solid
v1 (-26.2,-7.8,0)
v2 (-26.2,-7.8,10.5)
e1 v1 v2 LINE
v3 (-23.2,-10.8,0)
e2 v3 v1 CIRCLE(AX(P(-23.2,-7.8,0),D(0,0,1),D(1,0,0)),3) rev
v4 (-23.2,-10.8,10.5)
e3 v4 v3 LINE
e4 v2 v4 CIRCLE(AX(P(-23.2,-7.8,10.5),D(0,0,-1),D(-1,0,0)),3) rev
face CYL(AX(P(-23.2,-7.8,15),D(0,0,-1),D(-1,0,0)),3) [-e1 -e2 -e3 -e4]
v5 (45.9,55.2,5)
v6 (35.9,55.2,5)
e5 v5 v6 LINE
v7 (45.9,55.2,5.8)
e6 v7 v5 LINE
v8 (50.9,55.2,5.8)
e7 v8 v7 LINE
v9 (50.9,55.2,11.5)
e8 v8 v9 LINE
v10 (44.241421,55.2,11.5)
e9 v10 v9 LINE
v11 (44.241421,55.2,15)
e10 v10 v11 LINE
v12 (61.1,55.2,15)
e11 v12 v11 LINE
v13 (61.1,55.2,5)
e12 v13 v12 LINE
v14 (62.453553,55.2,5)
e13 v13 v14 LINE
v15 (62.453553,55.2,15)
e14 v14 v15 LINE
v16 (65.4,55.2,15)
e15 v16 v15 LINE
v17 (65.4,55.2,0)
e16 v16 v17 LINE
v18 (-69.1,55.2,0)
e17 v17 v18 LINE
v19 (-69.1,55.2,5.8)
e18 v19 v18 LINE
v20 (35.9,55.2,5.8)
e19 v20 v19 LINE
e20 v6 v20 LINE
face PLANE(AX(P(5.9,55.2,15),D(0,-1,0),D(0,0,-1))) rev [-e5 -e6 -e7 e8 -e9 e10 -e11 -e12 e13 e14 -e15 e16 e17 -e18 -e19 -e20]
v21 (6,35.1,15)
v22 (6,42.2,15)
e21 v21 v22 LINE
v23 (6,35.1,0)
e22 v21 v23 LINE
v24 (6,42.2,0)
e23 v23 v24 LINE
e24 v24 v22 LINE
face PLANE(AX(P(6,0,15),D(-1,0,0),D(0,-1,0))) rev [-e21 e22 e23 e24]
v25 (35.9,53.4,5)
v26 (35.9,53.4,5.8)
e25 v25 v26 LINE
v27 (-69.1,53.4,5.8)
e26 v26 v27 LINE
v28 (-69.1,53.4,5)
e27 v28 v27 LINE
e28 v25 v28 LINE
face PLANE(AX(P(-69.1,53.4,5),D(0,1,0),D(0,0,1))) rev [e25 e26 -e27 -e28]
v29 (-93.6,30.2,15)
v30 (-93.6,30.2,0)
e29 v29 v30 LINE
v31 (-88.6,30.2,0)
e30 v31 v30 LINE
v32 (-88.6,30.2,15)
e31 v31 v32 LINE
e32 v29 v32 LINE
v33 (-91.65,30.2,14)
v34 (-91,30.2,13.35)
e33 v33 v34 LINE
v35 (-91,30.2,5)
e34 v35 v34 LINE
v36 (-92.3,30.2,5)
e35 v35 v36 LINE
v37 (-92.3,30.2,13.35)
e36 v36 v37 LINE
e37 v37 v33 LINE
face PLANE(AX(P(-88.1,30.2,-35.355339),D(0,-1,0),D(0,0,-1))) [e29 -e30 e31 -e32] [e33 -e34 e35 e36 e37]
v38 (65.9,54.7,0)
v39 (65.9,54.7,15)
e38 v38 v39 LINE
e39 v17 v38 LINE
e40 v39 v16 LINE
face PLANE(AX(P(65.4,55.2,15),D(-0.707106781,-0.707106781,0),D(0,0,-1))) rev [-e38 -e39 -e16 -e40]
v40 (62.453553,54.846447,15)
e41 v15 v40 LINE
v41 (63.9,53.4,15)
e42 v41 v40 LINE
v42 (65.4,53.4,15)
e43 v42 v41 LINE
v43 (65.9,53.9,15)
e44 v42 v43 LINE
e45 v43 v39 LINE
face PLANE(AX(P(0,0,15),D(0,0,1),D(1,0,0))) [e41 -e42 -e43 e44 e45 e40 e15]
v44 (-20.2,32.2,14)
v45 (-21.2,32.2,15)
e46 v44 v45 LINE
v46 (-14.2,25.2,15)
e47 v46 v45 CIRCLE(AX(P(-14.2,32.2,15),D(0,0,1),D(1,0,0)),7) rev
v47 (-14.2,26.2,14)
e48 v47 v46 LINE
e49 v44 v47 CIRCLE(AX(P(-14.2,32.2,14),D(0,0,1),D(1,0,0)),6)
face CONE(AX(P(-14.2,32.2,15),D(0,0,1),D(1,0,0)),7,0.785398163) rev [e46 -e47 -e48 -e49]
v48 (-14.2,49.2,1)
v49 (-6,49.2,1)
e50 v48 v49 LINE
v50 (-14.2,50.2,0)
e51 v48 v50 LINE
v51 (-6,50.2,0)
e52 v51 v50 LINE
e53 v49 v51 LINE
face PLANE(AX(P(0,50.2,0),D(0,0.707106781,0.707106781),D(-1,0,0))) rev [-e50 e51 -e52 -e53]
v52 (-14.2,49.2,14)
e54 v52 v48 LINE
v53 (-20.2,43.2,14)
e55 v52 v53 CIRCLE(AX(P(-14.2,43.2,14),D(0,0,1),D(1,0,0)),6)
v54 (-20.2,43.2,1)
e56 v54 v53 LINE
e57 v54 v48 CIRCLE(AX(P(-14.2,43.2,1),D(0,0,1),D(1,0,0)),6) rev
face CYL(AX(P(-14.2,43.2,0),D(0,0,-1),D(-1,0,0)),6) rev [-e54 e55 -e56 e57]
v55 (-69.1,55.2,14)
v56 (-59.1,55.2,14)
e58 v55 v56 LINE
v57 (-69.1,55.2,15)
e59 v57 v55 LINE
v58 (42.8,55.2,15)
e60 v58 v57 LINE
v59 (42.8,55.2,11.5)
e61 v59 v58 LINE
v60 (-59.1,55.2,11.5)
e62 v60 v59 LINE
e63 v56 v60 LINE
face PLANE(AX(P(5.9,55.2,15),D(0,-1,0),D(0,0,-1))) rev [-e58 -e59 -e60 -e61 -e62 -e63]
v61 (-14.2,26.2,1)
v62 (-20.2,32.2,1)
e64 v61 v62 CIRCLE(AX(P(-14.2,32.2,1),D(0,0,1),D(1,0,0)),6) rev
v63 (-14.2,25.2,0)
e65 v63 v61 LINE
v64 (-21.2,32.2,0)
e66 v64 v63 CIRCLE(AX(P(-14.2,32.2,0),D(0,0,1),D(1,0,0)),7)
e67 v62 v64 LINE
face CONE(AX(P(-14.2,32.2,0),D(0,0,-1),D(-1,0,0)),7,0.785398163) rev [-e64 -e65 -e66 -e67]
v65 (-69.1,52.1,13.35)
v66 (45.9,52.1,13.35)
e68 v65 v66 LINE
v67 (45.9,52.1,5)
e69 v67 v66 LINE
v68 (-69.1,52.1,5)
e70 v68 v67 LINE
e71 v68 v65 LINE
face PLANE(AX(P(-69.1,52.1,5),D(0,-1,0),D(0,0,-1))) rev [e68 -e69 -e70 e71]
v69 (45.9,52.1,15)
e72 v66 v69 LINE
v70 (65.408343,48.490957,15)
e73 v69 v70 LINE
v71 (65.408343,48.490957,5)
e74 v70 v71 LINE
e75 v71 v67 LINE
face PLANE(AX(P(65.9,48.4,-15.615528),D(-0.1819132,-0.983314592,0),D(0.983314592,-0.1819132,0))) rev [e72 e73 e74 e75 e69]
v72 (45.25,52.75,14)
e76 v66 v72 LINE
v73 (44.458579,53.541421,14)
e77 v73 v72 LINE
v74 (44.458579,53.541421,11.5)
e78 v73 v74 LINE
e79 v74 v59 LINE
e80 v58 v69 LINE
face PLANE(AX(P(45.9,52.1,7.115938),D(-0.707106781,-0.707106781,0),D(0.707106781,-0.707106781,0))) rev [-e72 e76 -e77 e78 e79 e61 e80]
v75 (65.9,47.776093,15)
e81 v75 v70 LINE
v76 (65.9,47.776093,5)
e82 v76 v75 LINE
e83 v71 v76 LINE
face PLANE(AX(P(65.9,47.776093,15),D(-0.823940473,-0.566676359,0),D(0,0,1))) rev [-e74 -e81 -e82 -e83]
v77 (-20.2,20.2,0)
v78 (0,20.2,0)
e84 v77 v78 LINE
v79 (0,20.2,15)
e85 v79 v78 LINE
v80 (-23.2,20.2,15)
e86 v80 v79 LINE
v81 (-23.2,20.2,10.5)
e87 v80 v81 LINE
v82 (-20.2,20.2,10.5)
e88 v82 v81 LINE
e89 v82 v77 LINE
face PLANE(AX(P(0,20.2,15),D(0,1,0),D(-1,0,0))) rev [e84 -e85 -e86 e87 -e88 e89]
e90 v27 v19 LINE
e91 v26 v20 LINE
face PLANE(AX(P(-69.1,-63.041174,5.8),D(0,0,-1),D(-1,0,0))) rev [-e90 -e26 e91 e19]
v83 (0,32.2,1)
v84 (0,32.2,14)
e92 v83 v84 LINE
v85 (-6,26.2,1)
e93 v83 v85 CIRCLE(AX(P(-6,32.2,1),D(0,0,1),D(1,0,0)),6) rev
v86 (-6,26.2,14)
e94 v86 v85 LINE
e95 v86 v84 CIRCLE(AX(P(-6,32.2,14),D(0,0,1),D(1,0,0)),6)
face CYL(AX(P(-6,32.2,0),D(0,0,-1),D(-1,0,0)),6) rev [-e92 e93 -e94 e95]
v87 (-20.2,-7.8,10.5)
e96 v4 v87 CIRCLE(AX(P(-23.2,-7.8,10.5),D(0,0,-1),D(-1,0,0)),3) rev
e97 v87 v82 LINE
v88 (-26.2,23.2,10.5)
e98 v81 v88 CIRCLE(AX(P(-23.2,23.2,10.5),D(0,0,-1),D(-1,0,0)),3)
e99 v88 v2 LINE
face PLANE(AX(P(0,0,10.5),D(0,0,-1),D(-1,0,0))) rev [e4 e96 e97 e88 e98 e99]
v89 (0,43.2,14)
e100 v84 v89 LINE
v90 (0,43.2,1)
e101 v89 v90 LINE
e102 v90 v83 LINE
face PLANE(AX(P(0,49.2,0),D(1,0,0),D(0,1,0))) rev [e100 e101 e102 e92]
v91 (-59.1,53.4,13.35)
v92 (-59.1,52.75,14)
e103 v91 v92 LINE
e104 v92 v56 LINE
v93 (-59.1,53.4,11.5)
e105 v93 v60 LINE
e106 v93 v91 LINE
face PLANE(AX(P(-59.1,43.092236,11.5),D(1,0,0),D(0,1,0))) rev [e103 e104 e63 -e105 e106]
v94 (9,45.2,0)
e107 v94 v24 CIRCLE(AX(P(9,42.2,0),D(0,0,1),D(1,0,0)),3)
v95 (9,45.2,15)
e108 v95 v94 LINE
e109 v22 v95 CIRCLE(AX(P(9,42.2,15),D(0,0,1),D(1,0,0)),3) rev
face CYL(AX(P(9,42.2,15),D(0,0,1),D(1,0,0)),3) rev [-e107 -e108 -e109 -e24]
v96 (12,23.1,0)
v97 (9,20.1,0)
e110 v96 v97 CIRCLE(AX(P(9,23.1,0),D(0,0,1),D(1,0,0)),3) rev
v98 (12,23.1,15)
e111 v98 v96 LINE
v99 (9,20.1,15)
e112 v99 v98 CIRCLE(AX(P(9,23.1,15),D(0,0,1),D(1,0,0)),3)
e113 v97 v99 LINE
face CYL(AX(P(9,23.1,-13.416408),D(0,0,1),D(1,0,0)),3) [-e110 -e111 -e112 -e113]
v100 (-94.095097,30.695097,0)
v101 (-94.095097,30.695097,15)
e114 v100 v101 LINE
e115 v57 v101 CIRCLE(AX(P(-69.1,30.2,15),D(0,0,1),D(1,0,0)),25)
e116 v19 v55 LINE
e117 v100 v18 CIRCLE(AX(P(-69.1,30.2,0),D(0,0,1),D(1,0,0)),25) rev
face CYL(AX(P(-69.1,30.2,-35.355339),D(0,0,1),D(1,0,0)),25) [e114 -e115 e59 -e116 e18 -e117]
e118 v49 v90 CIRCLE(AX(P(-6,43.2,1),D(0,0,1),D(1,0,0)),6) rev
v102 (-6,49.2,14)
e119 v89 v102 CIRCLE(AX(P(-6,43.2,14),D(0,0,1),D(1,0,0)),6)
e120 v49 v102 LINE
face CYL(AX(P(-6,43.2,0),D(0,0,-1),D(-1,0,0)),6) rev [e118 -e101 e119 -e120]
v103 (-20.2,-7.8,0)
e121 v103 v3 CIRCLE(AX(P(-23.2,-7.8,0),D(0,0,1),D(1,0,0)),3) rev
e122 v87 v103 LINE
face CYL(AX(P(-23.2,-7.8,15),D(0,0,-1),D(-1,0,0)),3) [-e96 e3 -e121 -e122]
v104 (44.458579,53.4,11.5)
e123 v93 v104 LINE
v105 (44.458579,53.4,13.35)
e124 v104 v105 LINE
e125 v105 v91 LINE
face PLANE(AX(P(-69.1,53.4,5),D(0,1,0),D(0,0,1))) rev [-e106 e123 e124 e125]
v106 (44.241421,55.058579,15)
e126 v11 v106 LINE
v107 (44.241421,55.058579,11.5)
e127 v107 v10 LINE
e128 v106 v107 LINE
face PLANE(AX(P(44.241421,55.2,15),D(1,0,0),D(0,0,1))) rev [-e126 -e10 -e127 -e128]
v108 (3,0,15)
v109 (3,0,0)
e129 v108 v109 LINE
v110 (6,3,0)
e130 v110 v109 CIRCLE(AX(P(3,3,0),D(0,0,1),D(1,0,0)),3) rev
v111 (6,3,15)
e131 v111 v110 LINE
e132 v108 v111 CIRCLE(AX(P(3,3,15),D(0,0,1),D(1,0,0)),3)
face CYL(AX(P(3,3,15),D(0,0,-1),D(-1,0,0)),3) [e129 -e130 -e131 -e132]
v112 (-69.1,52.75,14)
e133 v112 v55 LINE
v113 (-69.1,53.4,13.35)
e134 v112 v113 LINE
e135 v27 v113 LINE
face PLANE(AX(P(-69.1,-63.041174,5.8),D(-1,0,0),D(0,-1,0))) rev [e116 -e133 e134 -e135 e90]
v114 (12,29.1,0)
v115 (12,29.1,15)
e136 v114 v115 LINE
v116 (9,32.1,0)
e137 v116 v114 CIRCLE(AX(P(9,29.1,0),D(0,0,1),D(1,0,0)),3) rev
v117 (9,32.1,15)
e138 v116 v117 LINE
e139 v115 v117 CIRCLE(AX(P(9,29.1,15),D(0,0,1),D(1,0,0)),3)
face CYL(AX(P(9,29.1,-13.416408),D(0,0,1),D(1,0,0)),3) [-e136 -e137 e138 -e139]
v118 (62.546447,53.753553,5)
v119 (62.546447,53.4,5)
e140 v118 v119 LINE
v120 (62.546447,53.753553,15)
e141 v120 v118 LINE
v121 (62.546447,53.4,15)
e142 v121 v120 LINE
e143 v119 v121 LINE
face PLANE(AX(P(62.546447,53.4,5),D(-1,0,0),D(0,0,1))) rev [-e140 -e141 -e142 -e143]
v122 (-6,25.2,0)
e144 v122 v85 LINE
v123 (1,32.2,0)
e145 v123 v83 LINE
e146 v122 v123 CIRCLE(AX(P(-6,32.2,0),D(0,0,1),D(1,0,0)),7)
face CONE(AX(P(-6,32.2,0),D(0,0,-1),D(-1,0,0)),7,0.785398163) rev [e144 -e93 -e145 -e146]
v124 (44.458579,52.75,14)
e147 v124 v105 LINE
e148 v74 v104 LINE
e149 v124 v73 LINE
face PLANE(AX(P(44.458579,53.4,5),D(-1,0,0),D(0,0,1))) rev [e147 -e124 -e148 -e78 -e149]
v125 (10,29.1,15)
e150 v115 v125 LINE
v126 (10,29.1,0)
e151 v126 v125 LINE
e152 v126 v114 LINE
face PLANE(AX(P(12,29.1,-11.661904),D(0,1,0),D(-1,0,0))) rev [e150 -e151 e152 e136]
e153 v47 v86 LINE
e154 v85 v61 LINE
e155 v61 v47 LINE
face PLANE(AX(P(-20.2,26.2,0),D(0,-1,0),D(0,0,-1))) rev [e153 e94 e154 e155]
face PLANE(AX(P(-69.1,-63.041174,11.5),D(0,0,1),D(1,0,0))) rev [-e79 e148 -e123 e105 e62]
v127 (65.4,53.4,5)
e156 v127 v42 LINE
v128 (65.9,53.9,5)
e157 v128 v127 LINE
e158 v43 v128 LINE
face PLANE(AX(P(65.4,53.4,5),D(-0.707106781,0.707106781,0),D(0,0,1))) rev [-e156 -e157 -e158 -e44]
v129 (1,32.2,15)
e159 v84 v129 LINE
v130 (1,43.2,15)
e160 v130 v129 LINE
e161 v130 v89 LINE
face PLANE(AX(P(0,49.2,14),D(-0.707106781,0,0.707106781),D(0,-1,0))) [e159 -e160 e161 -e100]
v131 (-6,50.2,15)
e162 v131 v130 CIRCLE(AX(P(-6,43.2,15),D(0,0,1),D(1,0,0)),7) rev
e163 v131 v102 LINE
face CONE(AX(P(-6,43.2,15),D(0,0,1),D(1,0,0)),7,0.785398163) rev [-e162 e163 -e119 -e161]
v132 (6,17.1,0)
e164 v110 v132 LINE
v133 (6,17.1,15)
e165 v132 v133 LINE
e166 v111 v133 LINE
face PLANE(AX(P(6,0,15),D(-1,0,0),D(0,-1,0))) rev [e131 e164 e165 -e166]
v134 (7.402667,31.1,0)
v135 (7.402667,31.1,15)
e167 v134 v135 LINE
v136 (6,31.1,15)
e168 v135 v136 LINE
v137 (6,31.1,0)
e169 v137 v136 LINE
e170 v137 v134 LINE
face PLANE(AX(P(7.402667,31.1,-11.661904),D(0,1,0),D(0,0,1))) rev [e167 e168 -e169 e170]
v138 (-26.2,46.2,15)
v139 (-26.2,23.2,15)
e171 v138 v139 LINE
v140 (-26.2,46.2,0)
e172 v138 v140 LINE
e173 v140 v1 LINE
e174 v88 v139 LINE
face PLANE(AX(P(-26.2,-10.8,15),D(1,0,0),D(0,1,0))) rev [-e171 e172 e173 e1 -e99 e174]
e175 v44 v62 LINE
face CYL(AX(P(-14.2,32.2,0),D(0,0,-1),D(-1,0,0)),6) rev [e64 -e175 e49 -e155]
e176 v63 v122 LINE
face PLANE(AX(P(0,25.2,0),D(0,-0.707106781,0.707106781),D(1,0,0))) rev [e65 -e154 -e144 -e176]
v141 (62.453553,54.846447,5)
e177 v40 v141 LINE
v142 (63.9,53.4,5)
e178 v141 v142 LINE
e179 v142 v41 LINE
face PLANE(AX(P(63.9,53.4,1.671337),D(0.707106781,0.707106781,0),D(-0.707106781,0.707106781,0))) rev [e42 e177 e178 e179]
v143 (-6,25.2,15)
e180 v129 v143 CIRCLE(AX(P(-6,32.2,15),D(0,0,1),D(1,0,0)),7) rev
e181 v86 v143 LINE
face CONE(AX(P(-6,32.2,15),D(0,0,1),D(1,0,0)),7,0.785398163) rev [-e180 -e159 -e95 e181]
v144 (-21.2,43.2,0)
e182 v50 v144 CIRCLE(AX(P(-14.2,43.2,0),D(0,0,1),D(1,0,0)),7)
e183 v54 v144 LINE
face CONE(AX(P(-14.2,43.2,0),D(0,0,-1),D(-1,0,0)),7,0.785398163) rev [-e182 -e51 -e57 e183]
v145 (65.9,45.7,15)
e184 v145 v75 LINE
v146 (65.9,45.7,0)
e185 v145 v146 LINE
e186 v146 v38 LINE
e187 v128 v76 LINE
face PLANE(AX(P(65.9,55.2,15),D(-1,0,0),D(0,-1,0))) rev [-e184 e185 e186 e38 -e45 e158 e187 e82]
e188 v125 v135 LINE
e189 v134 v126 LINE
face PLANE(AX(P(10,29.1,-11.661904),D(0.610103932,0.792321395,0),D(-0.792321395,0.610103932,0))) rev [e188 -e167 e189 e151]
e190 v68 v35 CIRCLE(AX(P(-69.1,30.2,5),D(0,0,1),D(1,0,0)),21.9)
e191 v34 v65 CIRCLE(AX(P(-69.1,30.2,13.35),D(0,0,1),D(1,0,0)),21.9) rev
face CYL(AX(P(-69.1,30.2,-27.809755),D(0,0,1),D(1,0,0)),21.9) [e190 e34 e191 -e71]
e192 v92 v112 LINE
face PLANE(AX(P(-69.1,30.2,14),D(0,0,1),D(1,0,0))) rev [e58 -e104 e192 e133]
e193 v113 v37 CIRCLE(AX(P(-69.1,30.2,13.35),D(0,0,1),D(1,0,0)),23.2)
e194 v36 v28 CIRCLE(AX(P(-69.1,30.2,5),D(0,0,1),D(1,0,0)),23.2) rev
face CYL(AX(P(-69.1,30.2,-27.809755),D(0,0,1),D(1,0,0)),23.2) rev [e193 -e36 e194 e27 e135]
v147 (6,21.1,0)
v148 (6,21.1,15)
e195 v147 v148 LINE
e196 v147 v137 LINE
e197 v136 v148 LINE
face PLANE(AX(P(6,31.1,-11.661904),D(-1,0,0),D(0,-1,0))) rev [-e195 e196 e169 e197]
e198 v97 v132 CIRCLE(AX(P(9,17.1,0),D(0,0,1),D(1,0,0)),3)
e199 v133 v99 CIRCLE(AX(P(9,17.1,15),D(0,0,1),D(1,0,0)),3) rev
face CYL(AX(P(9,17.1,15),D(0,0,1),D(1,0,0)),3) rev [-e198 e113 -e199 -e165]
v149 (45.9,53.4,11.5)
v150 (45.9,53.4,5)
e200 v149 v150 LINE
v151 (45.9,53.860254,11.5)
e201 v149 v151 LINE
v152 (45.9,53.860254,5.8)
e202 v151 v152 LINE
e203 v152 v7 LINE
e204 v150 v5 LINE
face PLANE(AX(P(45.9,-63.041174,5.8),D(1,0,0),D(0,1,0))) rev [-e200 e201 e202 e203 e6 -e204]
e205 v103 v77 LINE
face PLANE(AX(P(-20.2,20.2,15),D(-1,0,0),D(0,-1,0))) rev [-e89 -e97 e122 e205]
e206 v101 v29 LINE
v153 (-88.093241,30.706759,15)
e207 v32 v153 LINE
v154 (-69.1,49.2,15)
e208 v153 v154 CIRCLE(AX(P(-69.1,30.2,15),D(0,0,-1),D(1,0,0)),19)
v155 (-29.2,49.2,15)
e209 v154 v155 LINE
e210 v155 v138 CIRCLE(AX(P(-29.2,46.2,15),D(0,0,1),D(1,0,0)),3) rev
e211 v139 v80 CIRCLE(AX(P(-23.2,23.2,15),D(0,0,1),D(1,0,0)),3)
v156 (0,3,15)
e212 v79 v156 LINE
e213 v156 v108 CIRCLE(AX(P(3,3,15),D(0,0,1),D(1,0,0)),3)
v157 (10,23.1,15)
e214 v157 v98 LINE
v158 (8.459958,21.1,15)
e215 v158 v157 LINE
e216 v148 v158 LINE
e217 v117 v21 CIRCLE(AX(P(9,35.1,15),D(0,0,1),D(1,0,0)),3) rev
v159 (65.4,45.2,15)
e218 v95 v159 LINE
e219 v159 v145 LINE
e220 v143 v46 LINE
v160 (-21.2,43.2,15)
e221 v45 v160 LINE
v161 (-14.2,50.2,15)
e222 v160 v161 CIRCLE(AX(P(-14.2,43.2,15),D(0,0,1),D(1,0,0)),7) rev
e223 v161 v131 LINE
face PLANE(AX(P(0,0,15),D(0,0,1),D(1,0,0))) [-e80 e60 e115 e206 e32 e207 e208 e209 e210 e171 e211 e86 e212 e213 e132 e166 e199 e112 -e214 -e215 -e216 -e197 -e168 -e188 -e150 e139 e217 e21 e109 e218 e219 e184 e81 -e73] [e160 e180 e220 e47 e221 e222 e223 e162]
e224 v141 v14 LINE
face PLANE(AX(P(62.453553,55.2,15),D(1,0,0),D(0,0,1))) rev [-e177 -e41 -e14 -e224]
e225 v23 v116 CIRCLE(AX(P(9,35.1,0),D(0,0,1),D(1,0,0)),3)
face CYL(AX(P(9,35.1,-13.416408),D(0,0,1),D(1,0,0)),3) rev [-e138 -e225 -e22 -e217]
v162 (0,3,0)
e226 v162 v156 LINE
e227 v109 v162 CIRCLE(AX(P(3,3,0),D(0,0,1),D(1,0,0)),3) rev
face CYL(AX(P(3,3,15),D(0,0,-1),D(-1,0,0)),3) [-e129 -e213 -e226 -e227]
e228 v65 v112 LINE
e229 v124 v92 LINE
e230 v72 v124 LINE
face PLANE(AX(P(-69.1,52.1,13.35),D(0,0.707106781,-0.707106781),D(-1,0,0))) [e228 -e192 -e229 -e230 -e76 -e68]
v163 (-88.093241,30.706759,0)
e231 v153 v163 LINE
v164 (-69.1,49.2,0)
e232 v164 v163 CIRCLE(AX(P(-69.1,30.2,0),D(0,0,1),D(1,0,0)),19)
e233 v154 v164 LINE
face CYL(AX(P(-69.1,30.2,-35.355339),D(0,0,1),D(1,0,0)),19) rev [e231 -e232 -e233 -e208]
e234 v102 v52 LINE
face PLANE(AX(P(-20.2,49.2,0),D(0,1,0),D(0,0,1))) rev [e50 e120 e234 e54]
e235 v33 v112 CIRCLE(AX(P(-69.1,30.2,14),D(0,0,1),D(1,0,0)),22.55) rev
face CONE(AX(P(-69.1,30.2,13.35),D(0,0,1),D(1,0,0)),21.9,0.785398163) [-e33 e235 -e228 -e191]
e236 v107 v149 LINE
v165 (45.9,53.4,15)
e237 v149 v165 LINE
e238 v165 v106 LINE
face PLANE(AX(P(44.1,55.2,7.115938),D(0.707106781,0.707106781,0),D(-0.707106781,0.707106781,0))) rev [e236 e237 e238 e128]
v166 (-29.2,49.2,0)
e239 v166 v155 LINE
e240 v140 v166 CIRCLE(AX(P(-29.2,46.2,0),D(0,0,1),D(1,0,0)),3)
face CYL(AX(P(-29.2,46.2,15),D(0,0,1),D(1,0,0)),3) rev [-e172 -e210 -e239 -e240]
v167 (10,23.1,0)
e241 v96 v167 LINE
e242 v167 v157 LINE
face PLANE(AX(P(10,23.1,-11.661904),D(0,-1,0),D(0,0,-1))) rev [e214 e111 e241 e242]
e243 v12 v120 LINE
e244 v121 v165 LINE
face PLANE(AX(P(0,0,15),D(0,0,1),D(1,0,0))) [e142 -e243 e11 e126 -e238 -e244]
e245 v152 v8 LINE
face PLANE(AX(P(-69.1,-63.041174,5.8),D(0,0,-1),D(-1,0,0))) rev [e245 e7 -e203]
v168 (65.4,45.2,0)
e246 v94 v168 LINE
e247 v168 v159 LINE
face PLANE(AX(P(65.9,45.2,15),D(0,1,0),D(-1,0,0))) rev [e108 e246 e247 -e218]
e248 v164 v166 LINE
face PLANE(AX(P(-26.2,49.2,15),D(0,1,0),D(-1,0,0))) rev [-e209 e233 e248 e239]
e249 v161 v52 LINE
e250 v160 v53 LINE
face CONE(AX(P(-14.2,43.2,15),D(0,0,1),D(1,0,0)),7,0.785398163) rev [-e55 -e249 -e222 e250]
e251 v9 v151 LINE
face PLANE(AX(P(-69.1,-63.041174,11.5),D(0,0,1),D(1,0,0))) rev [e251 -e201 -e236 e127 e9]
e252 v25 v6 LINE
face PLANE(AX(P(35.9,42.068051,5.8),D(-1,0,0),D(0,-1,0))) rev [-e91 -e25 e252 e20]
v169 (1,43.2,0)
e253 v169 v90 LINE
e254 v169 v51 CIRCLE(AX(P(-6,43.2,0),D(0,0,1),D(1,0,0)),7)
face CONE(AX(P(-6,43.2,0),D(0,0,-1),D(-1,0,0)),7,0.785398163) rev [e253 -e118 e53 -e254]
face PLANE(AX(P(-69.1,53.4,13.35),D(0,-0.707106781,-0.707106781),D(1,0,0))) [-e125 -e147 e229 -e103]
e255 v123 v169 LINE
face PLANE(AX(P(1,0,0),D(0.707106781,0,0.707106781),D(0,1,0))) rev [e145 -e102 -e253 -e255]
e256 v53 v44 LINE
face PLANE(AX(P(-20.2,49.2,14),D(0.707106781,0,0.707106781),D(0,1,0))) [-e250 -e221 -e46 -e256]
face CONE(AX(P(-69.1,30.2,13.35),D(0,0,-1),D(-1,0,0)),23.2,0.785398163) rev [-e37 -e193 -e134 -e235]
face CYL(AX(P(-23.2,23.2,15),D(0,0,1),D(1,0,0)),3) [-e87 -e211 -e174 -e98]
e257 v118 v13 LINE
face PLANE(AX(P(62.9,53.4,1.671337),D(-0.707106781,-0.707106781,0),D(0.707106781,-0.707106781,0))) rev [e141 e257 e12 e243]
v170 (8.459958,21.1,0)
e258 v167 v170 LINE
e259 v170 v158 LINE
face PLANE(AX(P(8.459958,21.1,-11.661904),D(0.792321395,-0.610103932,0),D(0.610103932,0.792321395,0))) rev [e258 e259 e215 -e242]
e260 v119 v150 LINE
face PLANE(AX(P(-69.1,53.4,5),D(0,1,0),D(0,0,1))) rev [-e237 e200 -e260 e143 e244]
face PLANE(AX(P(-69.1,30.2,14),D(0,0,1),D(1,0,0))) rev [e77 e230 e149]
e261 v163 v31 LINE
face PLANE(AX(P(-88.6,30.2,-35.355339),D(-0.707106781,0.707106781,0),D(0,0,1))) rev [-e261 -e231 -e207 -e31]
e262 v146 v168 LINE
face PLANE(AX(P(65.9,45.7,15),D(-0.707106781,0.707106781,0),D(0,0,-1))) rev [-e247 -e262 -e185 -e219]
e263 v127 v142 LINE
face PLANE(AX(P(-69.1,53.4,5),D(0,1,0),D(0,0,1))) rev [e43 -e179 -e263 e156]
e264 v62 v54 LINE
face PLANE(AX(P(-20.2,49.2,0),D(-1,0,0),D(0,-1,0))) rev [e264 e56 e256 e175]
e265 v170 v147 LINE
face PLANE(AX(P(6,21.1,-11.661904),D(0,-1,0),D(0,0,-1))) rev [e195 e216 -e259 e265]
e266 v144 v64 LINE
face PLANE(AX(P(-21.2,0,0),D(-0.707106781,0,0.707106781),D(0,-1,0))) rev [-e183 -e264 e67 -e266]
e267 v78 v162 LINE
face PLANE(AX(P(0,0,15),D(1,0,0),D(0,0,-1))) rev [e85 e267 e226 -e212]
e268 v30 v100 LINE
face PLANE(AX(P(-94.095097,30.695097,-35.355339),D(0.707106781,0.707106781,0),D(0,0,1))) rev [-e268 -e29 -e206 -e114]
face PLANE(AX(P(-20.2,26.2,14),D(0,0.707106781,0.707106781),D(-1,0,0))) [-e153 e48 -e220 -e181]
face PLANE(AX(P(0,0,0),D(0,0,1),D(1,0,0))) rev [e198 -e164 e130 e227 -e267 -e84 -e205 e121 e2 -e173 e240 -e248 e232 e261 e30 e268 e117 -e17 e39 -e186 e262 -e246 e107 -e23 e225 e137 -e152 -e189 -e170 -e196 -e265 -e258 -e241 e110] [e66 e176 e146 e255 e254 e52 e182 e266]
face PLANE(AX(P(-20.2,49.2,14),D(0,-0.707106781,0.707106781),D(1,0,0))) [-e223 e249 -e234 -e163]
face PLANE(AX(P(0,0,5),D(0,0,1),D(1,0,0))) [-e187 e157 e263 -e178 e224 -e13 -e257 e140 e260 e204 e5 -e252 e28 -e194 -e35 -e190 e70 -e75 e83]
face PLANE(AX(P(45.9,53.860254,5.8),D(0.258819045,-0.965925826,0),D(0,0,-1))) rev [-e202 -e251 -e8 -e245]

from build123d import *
from OCP.BRepFilletAPI import BRepFilletAPI_MakeChamfer

# Parameters (mm, degrees)
BOSS_EXTRUDE1_DEPTH = 15
BOSS_EXTRUDE2_DEPTH = 15
SKETCH6_W           = 115
SKETCH6_H           = 1.3
CUT_EXTRUDE2_DEPTH  = 10
CUT_EXTRUDE3_DEPTH  = 10
CUT_EXTRUDE4_DEPTH  = 10
BOSS_EXTRUDE3_DEPTH = 1
CUT_EXTRUDE5_REACH  = 117.913
SKETCH10_W          = 115
SKETCH10_H          = 5.7
SKETCH13_W          = 20.2
SKETCH13_H          = 23
CUT_EXTRUDE6_DEPTH  = 111.121977825
FILLET1_R           = 6
SKETCH14_W          = 6
SKETCH14_H          = 31
CUT_EXTRUDE7_DEPTH  = 4.5
FILLET2_R           = 3
SKETCH16_W          = 10
SKETCH16_H          = 2.5
CUT_EXTRUDE8_DEPTH  = 1.8
CHAMFER1_SIZE       = 0.5
CHAMFER1_SIZE_2     = 0.623907076
CHAMFER2_SIZE       = 1
CHAMFER3_SIZE       = 5
CHAMFER3_SIZE2      = 1.339745962
CUT_EXTRUDE12_REACH = 112.118
CHAMFER4_SIZE       = 0.2
CHAMFER4_SIZE_2     = 0.141421356
SKETCH25_W          = 6
SKETCH25_H          = 12
BOSS_EXTRUDE6_DEPTH = 15
FILLET4_START       = -1
FILLET4_DEPTH       = 16
FILLET4_2_DEPTH     = 15
CUT_EXTRUDE15_DEPTH = 15
CUT_EXTRUDE16_DEPTH = 10
CHAMFER5_SIZE       = 0.5
CHAMFER5_SIZE2      = 0.353553391
CHAMFER6_SIZE       = 0.65
SKETCH29_W          = 10
SKETCH29_H          = 0.8
CUT_EXTRUDE17_DEPTH = 3.1


with BuildPart() as part:
    # Sketch3 → Boss-Extrude1 (new body)
    with BuildSketch(Plane.XY):
        Polygon((0, 0), (0, 20.2), (-20.2, 20.2), (-20.2, -10.8), (-26.2, -10.8), (-26.2, 49.2), (-69.1, 49.2), (-69.1, 55.2), (5.9, 55.2), (65.9, 55.2), (65.9, 45.2), (6, 45.2), (6, 0), align=None)
    extrude(amount=BOSS_EXTRUDE1_DEPTH)

    # Sketch4 → Boss-Extrude2 (add)
    with BuildSketch(Plane.XY.offset(15)):
        with BuildLine():
            Line((-88.1, 30.2), (-94.1, 30.2))
            ThreePointArc((-94.1, 30.2), (-86.77766953, 47.87766953), (-69.1, 55.2))
            Line((-69.1, 55.2), (-69.1, 49.2))
            ThreePointArc((-69.1, 49.2), (-82.535028843, 43.635028843), (-88.1, 30.2))
        make_face()
    extrude(amount=-BOSS_EXTRUDE2_DEPTH)

    # Sketch6 → Cut-Extrude2 (cut)
    with BuildSketch(Plane.XY.offset(15)):
        with Locations((-11.6, 52.75)):
            Rectangle(SKETCH6_W, SKETCH6_H)
    extrude(amount=-CUT_EXTRUDE2_DEPTH, mode=Mode.SUBTRACT)

    # Sketch7 → Cut-Extrude3 (cut)
    with BuildSketch(Plane.XY.offset(15)):
        with BuildLine():
            Line((-92.3, 30.2), (-91, 30.2))
            ThreePointArc((-91, 30.2), (-84.585638508, 45.685638508), (-69.1, 52.1))
            Line((-69.1, 52.1), (-69.1, 53.4))
            ThreePointArc((-69.1, 53.4), (-85.504877324, 46.604877324), (-92.3, 30.2))
        make_face()
    extrude(amount=-CUT_EXTRUDE3_DEPTH, mode=Mode.SUBTRACT)

    # Sketch8 → Cut-Extrude4 (cut)
    with BuildSketch(Plane.XY.offset(15)):
        Polygon((45.9, 53.4), (65.9, 53.4), (65.9, 48.4), (45.9, 52.1), align=None)
    extrude(amount=-CUT_EXTRUDE4_DEPTH, mode=Mode.SUBTRACT)

    # Sketch9 → Boss-Extrude3 (add)
    with BuildSketch(Plane.XY.offset(15)):
        with BuildLine():
            Line((-69.1, 52.1), (45.9, 52.1))
            Line((45.9, 52.1), (45.9, 53.4))
            Line((45.9, 53.4), (-69.1, 53.4))
            ThreePointArc((-69.1, 53.4), (-85.504877324, 46.604877324), (-92.3, 30.2))
            Line((-92.3, 30.2), (-91, 30.2))
            ThreePointArc((-91, 30.2), (-84.585638508, 45.685638508), (-69.1, 52.1))
        make_face()
    extrude(amount=-BOSS_EXTRUDE3_DEPTH)

    # Cut-Extrude5: up to this face of the body (flat: up to its plane)
    cut_extrude5_end = Plane(part.part.faces().sort_by_distance((-11.6, 52.1, 9.5))[0])
    # Sketch10 → Cut-Extrude5 (cut, up to the picked face)
    with BuildSketch(Plane(origin=(0, 55.2, 0), x_dir=(-1, 0, 0), z_dir=(0, 1, 0)), mode=Mode.PRIVATE) as cut_extrude5_sk1:
        with Locations((11.6, 8.65)):
            Rectangle(SKETCH10_W, SKETCH10_H)
    cut_extrude5_tool1 = split(extrude(cut_extrude5_sk1.sketch, amount=-CUT_EXTRUDE5_REACH, mode=Mode.PRIVATE), bisect_by=cut_extrude5_end, keep=Keep.BOTH, mode=Mode.PRIVATE)
    add(cut_extrude5_tool1.solids().sort_by(Axis((-11.6, 55.2, 8.65), (0, -1, 0)))[0], mode=Mode.SUBTRACT)

    # Sketch13 → Cut-Extrude6 (cut, through all)
    with BuildSketch(Plane.XY.offset(15)):
        with Locations((-10.1, 37.7)):
            Rectangle(SKETCH13_W, SKETCH13_H)
    extrude(amount=-CUT_EXTRUDE6_DEPTH, mode=Mode.SUBTRACT)

    # Fillet1
    fillet1_edges = [part.edges().sort_by_distance(p)[0] for p in [
        (-20.2, 26.2, 7.5),
        (-20.2, 49.2, 7.5),
        (0, 49.2, 7.5),
        (0, 26.2, 7.5),
    ]]
    fillet(fillet1_edges, radius=FILLET1_R)

    # Sketch14 → Cut-Extrude7 (cut)
    with BuildSketch(Plane.XY.offset(15)):
        with Locations((-23.2, 4.7)):
            Rectangle(SKETCH14_W, SKETCH14_H)
    extrude(amount=-CUT_EXTRUDE7_DEPTH, mode=Mode.SUBTRACT)

    # Fillet2
    fillet2_edges = [part.edges().sort_by_distance(p)[0] for p in [
        (-26.2, 49.2, 7.5),
        (6, 45.2, 7.5),
        (-26.2, 20.2, 12.75),
        (6, 0, 7.5),
        (0, 0, 7.5),
        (-20.2, -10.8, 5.25),
        (-26.2, -10.8, 5.25),
    ]]
    fillet(fillet2_edges, radius=FILLET2_R - 0.0001)  # a hair under: the kernel refuses the full size

    # Sketch16 → Cut-Extrude8 (cut)
    with BuildSketch(Plane(origin=(0, 55.2, 0), x_dir=(-1, 0, 0), z_dir=(0, 1, 0))):
        with Locations((64.1, 12.75)):
            Rectangle(SKETCH16_W, SKETCH16_H)
    extrude(amount=-CUT_EXTRUDE8_DEPTH, mode=Mode.SUBTRACT)

    # Chamfer1
    # the kernel refuses this chamfer: 0.623907076, 0.5 mm, written as the material it takes off along each edge
    with BuildSketch(Plane(origin=(65.9, 55.2, -1.285841494), x_dir=(-1, 0, 0), z_dir=(0, 0, 1)), Plane(origin=(65.9, 45.2, -1.285841494), x_dir=(0, 1, 0), z_dir=(0, 0, 1))) as chamfer1_piece_1:
        Polygon((CHAMFER1_SIZE, 0), (0, CHAMFER1_SIZE), (0, 0), align=None)
    extrude(amount=17.571682988, mode=Mode.SUBTRACT)
    with BuildSketch(Plane(origin=(-88.1, 30.2, 16.303301327), x_dir=(-1, 0, 0), z_dir=(0, 0, -1))) as chamfer1_piece_2:
        with BuildLine():
            Line((CHAMFER1_SIZE, 0), (-0.006759226, 0.506759226))
            ThreePointArc((-0.006759226, 0.506759226), (-0.001786833, 0.26056951), (0, 0))
            Line((0, 0), (CHAMFER1_SIZE, 0))
        make_face()
    extrude(amount=17.606602654, mode=Mode.SUBTRACT)
    with BuildSketch(Plane(origin=(-94.1, 30.2, 16.285841494), x_dir=(1, 0, 0), z_dir=(0, 0, -1))) as chamfer1_piece_3:
        with BuildLine():
            Line((CHAMFER1_SIZE, 0), (0.004902903, -0.495097097))
            ThreePointArc((0.004902903, -0.495097097), (0.001296043, -0.254559377), (0, 0))
            Line((0, 0), (CHAMFER1_SIZE, 0))
        make_face()
    extrude(amount=17.571682988, mode=Mode.SUBTRACT)
    with BuildSketch(Plane(origin=(65.9, 53.4, 16.285841494), x_dir=(-1, 0, 0), z_dir=(0, 0, -1))) as chamfer1_piece_4:
        Polygon((CHAMFER1_SIZE, 0), (0, CHAMFER1_SIZE), (0, 0), align=None)
    extrude(amount=11.285841494, mode=Mode.SUBTRACT)
    with BuildSketch(Plane(origin=(65.9, 48.4, 16.611561789), x_dir=(-0.983314592491791, 0.18191319961097666, 0), z_dir=(0, 0, -1))) as chamfer1_piece_5:
        Polygon((CHAMFER1_SIZE, 0), (-CHAMFER1_SIZE_2 * 0.181913199708, -CHAMFER1_SIZE_2 * 0.983314593014), (0, 0), align=None)
    extrude(amount=11.611561789, mode=Mode.SUBTRACT)

    # Chamfer2
    chamfer2_edges = [part.edges().sort_by_distance(p)[0] for p in [
        (-10.1, 49.2, 15),
        (-10.1, 49.2, 0),
        (0, 37.7, 15),
        (0, 37.7, 0),
        (-10.1, 26.2, 15),
        (-10.1, 26.2, 0),
        (-20.2, 37.7, 15),
        (-20.2, 37.7, 0),
        (-1.757359313, 47.442640687, 15),
        (-1.757359313, 47.442640687, 0),
        (-1.757359313, 27.957359313, 15),
        (-1.757359313, 27.957359313, 0),
        (-18.442640687, 27.957359313, 15),
        (-18.442640687, 27.957359313, 0),
        (-18.442640687, 47.442640687, 15),
        (-18.442640687, 47.442640687, 0),
    ]]
    chamfer(chamfer2_edges, length=CHAMFER2_SIZE)

    # Chamfer3
    chamfer3_edges = [part.edges().sort_by_distance(p)[0] for p in [
        (45.9, 55.2, 8.65),
    ]]
    chamfer3_side = [part.faces().sort_by_distance(p)[0] for p in [
        (64.046661535, 55.2, 7.5),
    ]]
    chamfer(chamfer3_edges, length=CHAMFER3_SIZE, length2=CHAMFER3_SIZE2, reference=chamfer3_side[0])

    # Cut-Extrude12: up to this face of the body (flat: up to its plane)
    cut_extrude12_end = Plane(part.part.faces().sort_by_distance((-5.656799941, 54.307895333, 11.5))[0])
    # Sketch20 → Cut-Extrude12 (cut, up to the picked face)
    with BuildSketch(Plane.XY.offset(15), mode=Mode.PRIVATE) as cut_extrude12_sk1:
        Polygon((45.9, 52.1), (42.8, 55.2), (44.1, 55.2), (45.9, 53.4), align=None)
    cut_extrude12_tool1 = split(extrude(cut_extrude12_sk1.sketch, amount=-CUT_EXTRUDE12_REACH, mode=Mode.PRIVATE), bisect_by=cut_extrude12_end, keep=Keep.BOTH, mode=Mode.PRIVATE)
    add(cut_extrude12_tool1.solids().sort_by(Axis((44.646259, 53.946259, 15), (0, 0, -1)))[0], mode=Mode.SUBTRACT)

    # Chamfer4
    # the kernel refuses this chamfer: 0.2, 0.141421356 mm, written as the material it takes off along each edge
    with BuildSketch(Plane(origin=(44.6, 53.4, 10.985663402), x_dir=(-0.7071067811865653, 0.7071067811865298, 0), z_dir=(0, 0, 1))) as chamfer4_piece_1:
        Polygon((CHAMFER4_SIZE, 0), (CHAMFER4_SIZE_2 * 0.707106782373, CHAMFER4_SIZE_2 * 0.707106782373), (0, 0), align=None)
    extrude(amount=3.014336598, mode=Mode.SUBTRACT)
    with BuildSketch(Plane(origin=(44.1, 55.2, 15.514336598), x_dir=(1, 0, 0), z_dir=(0, 0, -1))) as chamfer4_piece_2:
        Polygon((CHAMFER4_SIZE_2 * 1.00000000168, 0), (CHAMFER4_SIZE * 0.707106781187, CHAMFER4_SIZE * 0.707106781186), (0, 0), align=None)
    extrude(amount=4.528673195, mode=Mode.SUBTRACT)

    # Sketch25 → Boss-Extrude6 (add)
    with BuildSketch(Plane.XY.offset(15)):
        with Locations((9, 26.1)):
            Rectangle(SKETCH25_W, SKETCH25_H)
    extrude(amount=-BOSS_EXTRUDE6_DEPTH)

    # Fillet4: read off the stored shape, not the designer's step
    # Fillet4 outline → Fillet4 (cut)
    with BuildSketch(Plane.XY.offset(FILLET4_START)):
        with BuildLine():
            ThreePointArc((9, 32.1), (11.121320344, 31.221320344), (12, 29.1))
            Line((12, 29.1), (12, 32.1))
            Line((12, 32.1), (9, 32.1))
        make_face()
        with BuildLine():
            ThreePointArc((12, 23.1), (11.121320344, 20.978679656), (9, 20.1))
            Line((9, 20.1), (12, 20.1))
            Line((12, 20.1), (12, 23.1))
        make_face()
    extrude(amount=FILLET4_DEPTH, mode=Mode.SUBTRACT)

    # Fillet4 2 outline → Fillet4 2 (add)
    with BuildSketch(Plane.XY):
        with BuildLine():
            Line((6, 32.1), (9, 32.1))
            ThreePointArc((9, 32.1), (6.878679656, 32.978679656), (6, 35.1))
            Line((6, 35.1), (6, 32.1))
        make_face()
        with BuildLine():
            ThreePointArc((6, 17.1), (6.878679656, 19.221320344), (9, 20.1))
            Line((9, 20.1), (6, 20.1))
            Line((6, 20.1), (6, 17.1))
        make_face()
    extrude(amount=FILLET4_2_DEPTH)

    # Sketch26 → Cut-Extrude15 (cut)
    with BuildSketch(Plane.XY.offset(15)):
        Polygon((12, 29.1), (10, 29.1), (7.402667467, 31.1), (6, 31.1), (6, 21.1), (8.459958458, 21.1), (10, 23.1), (12, 23.1), align=None)
    extrude(amount=-CUT_EXTRUDE15_DEPTH, mode=Mode.SUBTRACT)

    # Sketch27 → Cut-Extrude16 (cut)
    with BuildSketch(Plane.XY.offset(15)):
        Polygon((62.9, 53.4), (61.1, 55.2), (62.1, 55.2), (63.9, 53.4), align=None)
    extrude(amount=-CUT_EXTRUDE16_DEPTH, mode=Mode.SUBTRACT)

    # Chamfer5: one chamfer whose edges measure the first distance from different faces: ONE call of the kernel's chamfer builder (chamfer() names one face for all edges)
    chamfer5_edges_1 = [part.edges().sort_by_distance(p)[0] for p in [
        (62.9, 53.4, 10),
    ]]
    chamfer5_side_1 = [part.faces().sort_by_distance(p)[0] for p in [
        (62, 54.3, 10),
    ]]
    chamfer5_edges_2 = [part.edges().sort_by_distance(p)[0] for p in [
        (62.1, 55.2, 10),
    ]]
    chamfer5_side_2 = [part.faces().sort_by_distance(p)[0] for p in [
        (63, 54.3, 10),
    ]]
    chamfer5 = BRepFilletAPI_MakeChamfer(part.part.solid().wrapped)
    for e in chamfer5_edges_1:
        chamfer5.Add(CHAMFER5_SIZE, CHAMFER5_SIZE2, e.wrapped, chamfer5_side_1[0].wrapped)  # the first distance lies on this face
    for e in chamfer5_edges_2:
        chamfer5.Add(CHAMFER5_SIZE, CHAMFER5_SIZE2, e.wrapped, chamfer5_side_2[0].wrapped)  # the first distance lies on this face
    add(Compound.cast(chamfer5.Shape()), mode=Mode.REPLACE)

    # Chamfer6
    chamfer6_edges = [part.edges().sort_by_distance(p)[0] for p in [
        (-7.320710678, 53.4, 14),
        (-11.6, 52.1, 14),
        (-84.585638508, 45.685638508, 14),
        (-85.504877324, 46.604877324, 14),
    ]]
    chamfer(chamfer6_edges, length=CHAMFER6_SIZE - 0.0001)  # a hair under: the kernel refuses the full size

    # Sketch29 → Cut-Extrude17 (cut)
    with BuildSketch(Plane(origin=(0, 55.2, 0), x_dir=(-1, 0, 0), z_dir=(0, 1, 0))):
        with Locations((-40.9, 5.4)):
            Rectangle(SKETCH29_W, SKETCH29_H)
    extrude(amount=-CUT_EXTRUDE17_DEPTH, mode=Mode.SUBTRACT)


solid = part.part
